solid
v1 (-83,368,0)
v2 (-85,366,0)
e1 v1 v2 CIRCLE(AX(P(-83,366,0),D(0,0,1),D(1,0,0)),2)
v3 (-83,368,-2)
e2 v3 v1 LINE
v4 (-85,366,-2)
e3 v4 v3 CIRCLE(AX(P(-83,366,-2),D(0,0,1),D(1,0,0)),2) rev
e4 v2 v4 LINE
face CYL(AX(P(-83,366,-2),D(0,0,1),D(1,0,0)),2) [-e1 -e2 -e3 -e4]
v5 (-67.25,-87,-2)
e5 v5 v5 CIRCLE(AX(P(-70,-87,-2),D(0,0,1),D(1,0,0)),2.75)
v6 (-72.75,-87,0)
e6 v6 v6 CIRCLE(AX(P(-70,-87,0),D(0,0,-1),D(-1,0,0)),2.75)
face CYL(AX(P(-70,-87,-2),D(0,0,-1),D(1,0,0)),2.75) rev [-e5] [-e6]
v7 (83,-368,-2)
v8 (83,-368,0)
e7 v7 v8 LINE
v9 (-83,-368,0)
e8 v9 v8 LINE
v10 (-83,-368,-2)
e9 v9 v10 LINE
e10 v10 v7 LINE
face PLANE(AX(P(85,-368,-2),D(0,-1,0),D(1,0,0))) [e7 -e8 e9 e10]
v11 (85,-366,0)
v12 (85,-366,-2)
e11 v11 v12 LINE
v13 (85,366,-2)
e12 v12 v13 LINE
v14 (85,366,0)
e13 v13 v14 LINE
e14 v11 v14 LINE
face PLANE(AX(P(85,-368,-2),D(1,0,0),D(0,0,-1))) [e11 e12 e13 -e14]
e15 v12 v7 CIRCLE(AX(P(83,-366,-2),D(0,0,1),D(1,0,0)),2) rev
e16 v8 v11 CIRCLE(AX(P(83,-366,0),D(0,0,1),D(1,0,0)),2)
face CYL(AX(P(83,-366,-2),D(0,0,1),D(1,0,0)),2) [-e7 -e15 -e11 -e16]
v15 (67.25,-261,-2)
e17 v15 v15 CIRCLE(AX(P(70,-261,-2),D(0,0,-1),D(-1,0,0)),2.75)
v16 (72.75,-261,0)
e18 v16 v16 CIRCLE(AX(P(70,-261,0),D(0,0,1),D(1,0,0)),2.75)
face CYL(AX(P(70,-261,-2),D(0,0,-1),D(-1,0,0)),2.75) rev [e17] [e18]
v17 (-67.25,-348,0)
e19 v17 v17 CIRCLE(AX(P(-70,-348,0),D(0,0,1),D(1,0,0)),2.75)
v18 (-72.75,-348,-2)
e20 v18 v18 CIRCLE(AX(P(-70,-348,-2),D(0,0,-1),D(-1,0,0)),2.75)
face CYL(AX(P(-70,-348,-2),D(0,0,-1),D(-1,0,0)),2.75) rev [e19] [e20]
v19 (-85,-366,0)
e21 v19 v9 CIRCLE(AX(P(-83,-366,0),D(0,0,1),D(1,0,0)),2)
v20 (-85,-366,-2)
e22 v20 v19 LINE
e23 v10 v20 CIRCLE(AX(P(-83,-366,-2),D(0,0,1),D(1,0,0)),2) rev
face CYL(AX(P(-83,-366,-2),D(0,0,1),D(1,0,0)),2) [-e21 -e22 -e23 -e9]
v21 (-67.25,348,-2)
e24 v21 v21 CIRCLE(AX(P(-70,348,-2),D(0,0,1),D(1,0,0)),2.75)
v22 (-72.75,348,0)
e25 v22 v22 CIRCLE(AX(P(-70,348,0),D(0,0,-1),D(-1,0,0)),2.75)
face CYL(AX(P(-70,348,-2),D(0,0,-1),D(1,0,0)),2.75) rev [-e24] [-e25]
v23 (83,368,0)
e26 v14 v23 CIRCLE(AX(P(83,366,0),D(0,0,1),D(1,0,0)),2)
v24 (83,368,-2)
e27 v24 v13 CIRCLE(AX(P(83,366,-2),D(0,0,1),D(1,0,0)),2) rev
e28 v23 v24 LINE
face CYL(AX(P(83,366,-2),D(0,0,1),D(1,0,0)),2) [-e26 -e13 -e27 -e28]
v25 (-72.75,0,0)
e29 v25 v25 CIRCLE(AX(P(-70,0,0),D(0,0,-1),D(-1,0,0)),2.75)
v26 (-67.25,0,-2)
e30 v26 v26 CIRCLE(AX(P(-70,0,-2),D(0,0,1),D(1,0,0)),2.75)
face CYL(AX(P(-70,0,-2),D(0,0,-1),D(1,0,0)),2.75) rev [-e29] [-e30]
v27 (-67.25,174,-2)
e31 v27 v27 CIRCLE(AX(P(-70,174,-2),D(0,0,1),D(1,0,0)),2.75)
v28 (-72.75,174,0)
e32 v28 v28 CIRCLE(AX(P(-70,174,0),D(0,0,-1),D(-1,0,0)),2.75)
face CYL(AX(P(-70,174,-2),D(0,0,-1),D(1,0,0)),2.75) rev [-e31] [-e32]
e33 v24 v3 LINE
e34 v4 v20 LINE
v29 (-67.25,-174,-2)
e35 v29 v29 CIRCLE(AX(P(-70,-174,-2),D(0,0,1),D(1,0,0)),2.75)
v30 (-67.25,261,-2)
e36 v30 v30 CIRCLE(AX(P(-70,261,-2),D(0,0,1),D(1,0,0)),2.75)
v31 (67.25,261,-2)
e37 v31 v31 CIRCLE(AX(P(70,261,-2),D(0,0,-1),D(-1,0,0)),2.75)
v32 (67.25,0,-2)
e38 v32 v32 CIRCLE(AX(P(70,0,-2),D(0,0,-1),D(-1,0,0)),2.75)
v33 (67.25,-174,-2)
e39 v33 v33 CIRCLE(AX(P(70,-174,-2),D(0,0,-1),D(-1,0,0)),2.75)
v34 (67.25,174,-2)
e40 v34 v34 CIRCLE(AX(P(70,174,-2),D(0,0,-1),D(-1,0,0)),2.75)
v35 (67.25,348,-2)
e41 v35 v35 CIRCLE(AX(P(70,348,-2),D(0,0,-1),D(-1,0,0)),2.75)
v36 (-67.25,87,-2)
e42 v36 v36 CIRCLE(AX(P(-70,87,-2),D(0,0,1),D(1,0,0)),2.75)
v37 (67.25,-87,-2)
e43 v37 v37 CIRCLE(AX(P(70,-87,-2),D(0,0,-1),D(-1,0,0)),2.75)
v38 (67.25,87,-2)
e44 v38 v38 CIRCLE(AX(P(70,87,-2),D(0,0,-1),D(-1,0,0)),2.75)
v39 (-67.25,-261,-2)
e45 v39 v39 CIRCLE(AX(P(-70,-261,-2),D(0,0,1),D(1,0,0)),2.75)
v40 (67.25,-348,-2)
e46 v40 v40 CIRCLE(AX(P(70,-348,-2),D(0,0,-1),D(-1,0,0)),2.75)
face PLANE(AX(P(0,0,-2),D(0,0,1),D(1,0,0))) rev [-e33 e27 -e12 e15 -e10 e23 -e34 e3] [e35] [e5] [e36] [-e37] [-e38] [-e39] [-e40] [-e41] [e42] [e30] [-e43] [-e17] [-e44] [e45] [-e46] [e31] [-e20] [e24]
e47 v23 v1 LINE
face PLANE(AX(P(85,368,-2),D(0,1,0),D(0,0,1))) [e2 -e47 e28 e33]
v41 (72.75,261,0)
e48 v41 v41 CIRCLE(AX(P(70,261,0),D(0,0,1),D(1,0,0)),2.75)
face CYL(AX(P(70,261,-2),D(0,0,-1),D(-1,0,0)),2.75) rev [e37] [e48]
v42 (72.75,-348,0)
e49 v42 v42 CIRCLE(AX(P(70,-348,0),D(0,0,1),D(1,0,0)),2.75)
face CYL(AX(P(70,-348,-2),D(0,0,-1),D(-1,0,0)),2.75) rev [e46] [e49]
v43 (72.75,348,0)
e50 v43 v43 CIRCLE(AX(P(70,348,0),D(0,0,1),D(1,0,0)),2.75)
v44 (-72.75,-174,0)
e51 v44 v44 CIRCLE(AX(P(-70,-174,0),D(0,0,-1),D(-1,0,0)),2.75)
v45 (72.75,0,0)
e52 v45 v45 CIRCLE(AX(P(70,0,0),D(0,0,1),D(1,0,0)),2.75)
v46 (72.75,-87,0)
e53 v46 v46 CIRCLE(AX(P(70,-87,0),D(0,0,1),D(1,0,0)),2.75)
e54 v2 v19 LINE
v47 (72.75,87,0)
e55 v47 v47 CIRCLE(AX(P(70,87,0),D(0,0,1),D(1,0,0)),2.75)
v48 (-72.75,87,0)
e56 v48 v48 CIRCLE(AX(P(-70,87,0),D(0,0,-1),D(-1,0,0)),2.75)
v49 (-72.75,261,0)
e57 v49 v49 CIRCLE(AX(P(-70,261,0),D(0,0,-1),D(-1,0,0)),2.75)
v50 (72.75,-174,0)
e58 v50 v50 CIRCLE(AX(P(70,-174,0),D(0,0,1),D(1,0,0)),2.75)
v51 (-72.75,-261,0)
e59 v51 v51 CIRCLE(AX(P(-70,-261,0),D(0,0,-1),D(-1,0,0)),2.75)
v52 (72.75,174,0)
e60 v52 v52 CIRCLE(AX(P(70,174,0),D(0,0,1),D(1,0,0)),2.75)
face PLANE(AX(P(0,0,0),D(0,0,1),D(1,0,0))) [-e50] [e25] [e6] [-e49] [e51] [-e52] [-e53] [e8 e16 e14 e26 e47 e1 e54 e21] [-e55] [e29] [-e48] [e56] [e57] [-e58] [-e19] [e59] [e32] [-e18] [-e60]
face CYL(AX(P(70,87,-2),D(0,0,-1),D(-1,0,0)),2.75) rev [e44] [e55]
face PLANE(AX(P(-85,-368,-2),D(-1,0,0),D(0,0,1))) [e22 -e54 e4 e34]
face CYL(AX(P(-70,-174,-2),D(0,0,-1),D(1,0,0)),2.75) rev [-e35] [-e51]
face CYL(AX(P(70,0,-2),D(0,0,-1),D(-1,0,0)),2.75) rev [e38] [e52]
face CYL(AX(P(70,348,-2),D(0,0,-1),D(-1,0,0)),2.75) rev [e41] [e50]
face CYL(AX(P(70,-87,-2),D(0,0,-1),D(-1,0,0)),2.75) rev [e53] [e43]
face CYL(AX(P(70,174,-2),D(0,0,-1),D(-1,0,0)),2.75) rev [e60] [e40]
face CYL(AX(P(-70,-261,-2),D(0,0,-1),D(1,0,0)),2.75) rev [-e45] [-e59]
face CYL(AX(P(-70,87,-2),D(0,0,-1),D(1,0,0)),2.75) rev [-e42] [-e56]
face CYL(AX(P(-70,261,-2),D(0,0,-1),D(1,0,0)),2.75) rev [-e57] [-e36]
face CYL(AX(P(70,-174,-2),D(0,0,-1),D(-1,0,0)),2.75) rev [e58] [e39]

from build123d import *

# Parameters (mm, degrees)
SKETCH1_W            = 170
SKETCH1_H            = 736
BASE_FLANGE1_DEPTH   = 2
M5_CLEARANCE_HOLE1_D = 5.5
CRVPATTERN1_COUNT    = 9
CRVPATTERN1_PITCH    = 87
MIRROR1_COPY_1_D     = 5.5
MIRROR1_COPY_2_D     = 5.5
MIRROR1_COPY_3_D     = 5.5
MIRROR1_COPY_4_D     = 5.5
MIRROR1_COPY_5_D     = 5.5
MIRROR1_COPY_6_D     = 5.5
MIRROR1_COPY_7_D     = 5.5
MIRROR1_COPY_8_D     = 5.5
FILLET1_R            = 2


# Sheet-metal steps are written as plain solids
with BuildPart() as part:
    # Sketch1 → Base-Flange1 (new body)
    with BuildSketch(Plane.XY):
        Rectangle(SKETCH1_W, SKETCH1_H)
    extrude(amount=-BASE_FLANGE1_DEPTH)

    # M5 Clearance Hole1 (through all)
    with Locations(Plane(origin=(0, 0, -2), x_dir=(-1, 0, 0), z_dir=(0, 0, -1))):
        with Locations((-70, -348)):
            m5_clearance_hole1 = Hole(M5_CLEARANCE_HOLE1_D / 2)

    # CrvPattern1: M5 Clearance Hole1 ×9
    with Locations(*[(0, i * CRVPATTERN1_PITCH, 0) for i in range(1, CRVPATTERN1_COUNT)]):
        add(m5_clearance_hole1, mode=Mode.SUBTRACT)

    # Mirror1: M5 Clearance Hole1 across plane
    add(m5_clearance_hole1.mirror(Plane(origin=(0, 0, 0), x_dir=(0, 0, 1), z_dir=(1, 0, 0))), mode=Mode.SUBTRACT)

    # Mirror1 copy 1 (through all)
    with Locations(Plane(origin=(0, 87, -2), x_dir=(1, 0, 0), z_dir=(0, 0, -1))):
        with Locations((-70, 348)):
            Hole(MIRROR1_COPY_1_D / 2)

    # Mirror1 copy 2 (through all)
    with Locations(Plane(origin=(0, 174, -2), x_dir=(1, 0, 0), z_dir=(0, 0, -1))):
        with Locations((-70, 348)):
            Hole(MIRROR1_COPY_2_D / 2)

    # Mirror1 copy 3 (through all)
    with Locations(Plane(origin=(0, 261, -2), x_dir=(1, 0, 0), z_dir=(0, 0, -1))):
        with Locations((-70, 348)):
            Hole(MIRROR1_COPY_3_D / 2)

    # Mirror1 copy 4 (through all)
    with Locations(Plane(origin=(0, 348, -2), x_dir=(1, 0, 0), z_dir=(0, 0, -1))):
        with Locations((-70, 348)):
            Hole(MIRROR1_COPY_4_D / 2)

    # Mirror1 copy 5 (through all)
    with Locations(Plane(origin=(0, 435, -2), x_dir=(1, 0, 0), z_dir=(0, 0, -1))):
        with Locations((-70, 348)):
            Hole(MIRROR1_COPY_5_D / 2)

    # Mirror1 copy 6 (through all)
    with Locations(Plane(origin=(0, 522, -2), x_dir=(1, 0, 0), z_dir=(0, 0, -1))):
        with Locations((-70, 348)):
            Hole(MIRROR1_COPY_6_D / 2)

    # Mirror1 copy 7 (through all)
    with Locations(Plane(origin=(0, 609, -2), x_dir=(1, 0, 0), z_dir=(0, 0, -1))):
        with Locations((-70, 348)):
            Hole(MIRROR1_COPY_7_D / 2)

    # Mirror1 copy 8 (through all)
    with Locations(Plane(origin=(0, 696, -2), x_dir=(1, 0, 0), z_dir=(0, 0, -1))):
        with Locations((-70, 348)):
            Hole(MIRROR1_COPY_8_D / 2)

    # Fillet1
    fillet1_edges = [part.edges().sort_by_distance(p)[0] for p in [
        (-85, 368, -1),
        (85, 368, -1),
        (85, -368, -1),
        (-85, -368, -1),
    ]]
    fillet(fillet1_edges, radius=FILLET1_R)


solid = part.part
